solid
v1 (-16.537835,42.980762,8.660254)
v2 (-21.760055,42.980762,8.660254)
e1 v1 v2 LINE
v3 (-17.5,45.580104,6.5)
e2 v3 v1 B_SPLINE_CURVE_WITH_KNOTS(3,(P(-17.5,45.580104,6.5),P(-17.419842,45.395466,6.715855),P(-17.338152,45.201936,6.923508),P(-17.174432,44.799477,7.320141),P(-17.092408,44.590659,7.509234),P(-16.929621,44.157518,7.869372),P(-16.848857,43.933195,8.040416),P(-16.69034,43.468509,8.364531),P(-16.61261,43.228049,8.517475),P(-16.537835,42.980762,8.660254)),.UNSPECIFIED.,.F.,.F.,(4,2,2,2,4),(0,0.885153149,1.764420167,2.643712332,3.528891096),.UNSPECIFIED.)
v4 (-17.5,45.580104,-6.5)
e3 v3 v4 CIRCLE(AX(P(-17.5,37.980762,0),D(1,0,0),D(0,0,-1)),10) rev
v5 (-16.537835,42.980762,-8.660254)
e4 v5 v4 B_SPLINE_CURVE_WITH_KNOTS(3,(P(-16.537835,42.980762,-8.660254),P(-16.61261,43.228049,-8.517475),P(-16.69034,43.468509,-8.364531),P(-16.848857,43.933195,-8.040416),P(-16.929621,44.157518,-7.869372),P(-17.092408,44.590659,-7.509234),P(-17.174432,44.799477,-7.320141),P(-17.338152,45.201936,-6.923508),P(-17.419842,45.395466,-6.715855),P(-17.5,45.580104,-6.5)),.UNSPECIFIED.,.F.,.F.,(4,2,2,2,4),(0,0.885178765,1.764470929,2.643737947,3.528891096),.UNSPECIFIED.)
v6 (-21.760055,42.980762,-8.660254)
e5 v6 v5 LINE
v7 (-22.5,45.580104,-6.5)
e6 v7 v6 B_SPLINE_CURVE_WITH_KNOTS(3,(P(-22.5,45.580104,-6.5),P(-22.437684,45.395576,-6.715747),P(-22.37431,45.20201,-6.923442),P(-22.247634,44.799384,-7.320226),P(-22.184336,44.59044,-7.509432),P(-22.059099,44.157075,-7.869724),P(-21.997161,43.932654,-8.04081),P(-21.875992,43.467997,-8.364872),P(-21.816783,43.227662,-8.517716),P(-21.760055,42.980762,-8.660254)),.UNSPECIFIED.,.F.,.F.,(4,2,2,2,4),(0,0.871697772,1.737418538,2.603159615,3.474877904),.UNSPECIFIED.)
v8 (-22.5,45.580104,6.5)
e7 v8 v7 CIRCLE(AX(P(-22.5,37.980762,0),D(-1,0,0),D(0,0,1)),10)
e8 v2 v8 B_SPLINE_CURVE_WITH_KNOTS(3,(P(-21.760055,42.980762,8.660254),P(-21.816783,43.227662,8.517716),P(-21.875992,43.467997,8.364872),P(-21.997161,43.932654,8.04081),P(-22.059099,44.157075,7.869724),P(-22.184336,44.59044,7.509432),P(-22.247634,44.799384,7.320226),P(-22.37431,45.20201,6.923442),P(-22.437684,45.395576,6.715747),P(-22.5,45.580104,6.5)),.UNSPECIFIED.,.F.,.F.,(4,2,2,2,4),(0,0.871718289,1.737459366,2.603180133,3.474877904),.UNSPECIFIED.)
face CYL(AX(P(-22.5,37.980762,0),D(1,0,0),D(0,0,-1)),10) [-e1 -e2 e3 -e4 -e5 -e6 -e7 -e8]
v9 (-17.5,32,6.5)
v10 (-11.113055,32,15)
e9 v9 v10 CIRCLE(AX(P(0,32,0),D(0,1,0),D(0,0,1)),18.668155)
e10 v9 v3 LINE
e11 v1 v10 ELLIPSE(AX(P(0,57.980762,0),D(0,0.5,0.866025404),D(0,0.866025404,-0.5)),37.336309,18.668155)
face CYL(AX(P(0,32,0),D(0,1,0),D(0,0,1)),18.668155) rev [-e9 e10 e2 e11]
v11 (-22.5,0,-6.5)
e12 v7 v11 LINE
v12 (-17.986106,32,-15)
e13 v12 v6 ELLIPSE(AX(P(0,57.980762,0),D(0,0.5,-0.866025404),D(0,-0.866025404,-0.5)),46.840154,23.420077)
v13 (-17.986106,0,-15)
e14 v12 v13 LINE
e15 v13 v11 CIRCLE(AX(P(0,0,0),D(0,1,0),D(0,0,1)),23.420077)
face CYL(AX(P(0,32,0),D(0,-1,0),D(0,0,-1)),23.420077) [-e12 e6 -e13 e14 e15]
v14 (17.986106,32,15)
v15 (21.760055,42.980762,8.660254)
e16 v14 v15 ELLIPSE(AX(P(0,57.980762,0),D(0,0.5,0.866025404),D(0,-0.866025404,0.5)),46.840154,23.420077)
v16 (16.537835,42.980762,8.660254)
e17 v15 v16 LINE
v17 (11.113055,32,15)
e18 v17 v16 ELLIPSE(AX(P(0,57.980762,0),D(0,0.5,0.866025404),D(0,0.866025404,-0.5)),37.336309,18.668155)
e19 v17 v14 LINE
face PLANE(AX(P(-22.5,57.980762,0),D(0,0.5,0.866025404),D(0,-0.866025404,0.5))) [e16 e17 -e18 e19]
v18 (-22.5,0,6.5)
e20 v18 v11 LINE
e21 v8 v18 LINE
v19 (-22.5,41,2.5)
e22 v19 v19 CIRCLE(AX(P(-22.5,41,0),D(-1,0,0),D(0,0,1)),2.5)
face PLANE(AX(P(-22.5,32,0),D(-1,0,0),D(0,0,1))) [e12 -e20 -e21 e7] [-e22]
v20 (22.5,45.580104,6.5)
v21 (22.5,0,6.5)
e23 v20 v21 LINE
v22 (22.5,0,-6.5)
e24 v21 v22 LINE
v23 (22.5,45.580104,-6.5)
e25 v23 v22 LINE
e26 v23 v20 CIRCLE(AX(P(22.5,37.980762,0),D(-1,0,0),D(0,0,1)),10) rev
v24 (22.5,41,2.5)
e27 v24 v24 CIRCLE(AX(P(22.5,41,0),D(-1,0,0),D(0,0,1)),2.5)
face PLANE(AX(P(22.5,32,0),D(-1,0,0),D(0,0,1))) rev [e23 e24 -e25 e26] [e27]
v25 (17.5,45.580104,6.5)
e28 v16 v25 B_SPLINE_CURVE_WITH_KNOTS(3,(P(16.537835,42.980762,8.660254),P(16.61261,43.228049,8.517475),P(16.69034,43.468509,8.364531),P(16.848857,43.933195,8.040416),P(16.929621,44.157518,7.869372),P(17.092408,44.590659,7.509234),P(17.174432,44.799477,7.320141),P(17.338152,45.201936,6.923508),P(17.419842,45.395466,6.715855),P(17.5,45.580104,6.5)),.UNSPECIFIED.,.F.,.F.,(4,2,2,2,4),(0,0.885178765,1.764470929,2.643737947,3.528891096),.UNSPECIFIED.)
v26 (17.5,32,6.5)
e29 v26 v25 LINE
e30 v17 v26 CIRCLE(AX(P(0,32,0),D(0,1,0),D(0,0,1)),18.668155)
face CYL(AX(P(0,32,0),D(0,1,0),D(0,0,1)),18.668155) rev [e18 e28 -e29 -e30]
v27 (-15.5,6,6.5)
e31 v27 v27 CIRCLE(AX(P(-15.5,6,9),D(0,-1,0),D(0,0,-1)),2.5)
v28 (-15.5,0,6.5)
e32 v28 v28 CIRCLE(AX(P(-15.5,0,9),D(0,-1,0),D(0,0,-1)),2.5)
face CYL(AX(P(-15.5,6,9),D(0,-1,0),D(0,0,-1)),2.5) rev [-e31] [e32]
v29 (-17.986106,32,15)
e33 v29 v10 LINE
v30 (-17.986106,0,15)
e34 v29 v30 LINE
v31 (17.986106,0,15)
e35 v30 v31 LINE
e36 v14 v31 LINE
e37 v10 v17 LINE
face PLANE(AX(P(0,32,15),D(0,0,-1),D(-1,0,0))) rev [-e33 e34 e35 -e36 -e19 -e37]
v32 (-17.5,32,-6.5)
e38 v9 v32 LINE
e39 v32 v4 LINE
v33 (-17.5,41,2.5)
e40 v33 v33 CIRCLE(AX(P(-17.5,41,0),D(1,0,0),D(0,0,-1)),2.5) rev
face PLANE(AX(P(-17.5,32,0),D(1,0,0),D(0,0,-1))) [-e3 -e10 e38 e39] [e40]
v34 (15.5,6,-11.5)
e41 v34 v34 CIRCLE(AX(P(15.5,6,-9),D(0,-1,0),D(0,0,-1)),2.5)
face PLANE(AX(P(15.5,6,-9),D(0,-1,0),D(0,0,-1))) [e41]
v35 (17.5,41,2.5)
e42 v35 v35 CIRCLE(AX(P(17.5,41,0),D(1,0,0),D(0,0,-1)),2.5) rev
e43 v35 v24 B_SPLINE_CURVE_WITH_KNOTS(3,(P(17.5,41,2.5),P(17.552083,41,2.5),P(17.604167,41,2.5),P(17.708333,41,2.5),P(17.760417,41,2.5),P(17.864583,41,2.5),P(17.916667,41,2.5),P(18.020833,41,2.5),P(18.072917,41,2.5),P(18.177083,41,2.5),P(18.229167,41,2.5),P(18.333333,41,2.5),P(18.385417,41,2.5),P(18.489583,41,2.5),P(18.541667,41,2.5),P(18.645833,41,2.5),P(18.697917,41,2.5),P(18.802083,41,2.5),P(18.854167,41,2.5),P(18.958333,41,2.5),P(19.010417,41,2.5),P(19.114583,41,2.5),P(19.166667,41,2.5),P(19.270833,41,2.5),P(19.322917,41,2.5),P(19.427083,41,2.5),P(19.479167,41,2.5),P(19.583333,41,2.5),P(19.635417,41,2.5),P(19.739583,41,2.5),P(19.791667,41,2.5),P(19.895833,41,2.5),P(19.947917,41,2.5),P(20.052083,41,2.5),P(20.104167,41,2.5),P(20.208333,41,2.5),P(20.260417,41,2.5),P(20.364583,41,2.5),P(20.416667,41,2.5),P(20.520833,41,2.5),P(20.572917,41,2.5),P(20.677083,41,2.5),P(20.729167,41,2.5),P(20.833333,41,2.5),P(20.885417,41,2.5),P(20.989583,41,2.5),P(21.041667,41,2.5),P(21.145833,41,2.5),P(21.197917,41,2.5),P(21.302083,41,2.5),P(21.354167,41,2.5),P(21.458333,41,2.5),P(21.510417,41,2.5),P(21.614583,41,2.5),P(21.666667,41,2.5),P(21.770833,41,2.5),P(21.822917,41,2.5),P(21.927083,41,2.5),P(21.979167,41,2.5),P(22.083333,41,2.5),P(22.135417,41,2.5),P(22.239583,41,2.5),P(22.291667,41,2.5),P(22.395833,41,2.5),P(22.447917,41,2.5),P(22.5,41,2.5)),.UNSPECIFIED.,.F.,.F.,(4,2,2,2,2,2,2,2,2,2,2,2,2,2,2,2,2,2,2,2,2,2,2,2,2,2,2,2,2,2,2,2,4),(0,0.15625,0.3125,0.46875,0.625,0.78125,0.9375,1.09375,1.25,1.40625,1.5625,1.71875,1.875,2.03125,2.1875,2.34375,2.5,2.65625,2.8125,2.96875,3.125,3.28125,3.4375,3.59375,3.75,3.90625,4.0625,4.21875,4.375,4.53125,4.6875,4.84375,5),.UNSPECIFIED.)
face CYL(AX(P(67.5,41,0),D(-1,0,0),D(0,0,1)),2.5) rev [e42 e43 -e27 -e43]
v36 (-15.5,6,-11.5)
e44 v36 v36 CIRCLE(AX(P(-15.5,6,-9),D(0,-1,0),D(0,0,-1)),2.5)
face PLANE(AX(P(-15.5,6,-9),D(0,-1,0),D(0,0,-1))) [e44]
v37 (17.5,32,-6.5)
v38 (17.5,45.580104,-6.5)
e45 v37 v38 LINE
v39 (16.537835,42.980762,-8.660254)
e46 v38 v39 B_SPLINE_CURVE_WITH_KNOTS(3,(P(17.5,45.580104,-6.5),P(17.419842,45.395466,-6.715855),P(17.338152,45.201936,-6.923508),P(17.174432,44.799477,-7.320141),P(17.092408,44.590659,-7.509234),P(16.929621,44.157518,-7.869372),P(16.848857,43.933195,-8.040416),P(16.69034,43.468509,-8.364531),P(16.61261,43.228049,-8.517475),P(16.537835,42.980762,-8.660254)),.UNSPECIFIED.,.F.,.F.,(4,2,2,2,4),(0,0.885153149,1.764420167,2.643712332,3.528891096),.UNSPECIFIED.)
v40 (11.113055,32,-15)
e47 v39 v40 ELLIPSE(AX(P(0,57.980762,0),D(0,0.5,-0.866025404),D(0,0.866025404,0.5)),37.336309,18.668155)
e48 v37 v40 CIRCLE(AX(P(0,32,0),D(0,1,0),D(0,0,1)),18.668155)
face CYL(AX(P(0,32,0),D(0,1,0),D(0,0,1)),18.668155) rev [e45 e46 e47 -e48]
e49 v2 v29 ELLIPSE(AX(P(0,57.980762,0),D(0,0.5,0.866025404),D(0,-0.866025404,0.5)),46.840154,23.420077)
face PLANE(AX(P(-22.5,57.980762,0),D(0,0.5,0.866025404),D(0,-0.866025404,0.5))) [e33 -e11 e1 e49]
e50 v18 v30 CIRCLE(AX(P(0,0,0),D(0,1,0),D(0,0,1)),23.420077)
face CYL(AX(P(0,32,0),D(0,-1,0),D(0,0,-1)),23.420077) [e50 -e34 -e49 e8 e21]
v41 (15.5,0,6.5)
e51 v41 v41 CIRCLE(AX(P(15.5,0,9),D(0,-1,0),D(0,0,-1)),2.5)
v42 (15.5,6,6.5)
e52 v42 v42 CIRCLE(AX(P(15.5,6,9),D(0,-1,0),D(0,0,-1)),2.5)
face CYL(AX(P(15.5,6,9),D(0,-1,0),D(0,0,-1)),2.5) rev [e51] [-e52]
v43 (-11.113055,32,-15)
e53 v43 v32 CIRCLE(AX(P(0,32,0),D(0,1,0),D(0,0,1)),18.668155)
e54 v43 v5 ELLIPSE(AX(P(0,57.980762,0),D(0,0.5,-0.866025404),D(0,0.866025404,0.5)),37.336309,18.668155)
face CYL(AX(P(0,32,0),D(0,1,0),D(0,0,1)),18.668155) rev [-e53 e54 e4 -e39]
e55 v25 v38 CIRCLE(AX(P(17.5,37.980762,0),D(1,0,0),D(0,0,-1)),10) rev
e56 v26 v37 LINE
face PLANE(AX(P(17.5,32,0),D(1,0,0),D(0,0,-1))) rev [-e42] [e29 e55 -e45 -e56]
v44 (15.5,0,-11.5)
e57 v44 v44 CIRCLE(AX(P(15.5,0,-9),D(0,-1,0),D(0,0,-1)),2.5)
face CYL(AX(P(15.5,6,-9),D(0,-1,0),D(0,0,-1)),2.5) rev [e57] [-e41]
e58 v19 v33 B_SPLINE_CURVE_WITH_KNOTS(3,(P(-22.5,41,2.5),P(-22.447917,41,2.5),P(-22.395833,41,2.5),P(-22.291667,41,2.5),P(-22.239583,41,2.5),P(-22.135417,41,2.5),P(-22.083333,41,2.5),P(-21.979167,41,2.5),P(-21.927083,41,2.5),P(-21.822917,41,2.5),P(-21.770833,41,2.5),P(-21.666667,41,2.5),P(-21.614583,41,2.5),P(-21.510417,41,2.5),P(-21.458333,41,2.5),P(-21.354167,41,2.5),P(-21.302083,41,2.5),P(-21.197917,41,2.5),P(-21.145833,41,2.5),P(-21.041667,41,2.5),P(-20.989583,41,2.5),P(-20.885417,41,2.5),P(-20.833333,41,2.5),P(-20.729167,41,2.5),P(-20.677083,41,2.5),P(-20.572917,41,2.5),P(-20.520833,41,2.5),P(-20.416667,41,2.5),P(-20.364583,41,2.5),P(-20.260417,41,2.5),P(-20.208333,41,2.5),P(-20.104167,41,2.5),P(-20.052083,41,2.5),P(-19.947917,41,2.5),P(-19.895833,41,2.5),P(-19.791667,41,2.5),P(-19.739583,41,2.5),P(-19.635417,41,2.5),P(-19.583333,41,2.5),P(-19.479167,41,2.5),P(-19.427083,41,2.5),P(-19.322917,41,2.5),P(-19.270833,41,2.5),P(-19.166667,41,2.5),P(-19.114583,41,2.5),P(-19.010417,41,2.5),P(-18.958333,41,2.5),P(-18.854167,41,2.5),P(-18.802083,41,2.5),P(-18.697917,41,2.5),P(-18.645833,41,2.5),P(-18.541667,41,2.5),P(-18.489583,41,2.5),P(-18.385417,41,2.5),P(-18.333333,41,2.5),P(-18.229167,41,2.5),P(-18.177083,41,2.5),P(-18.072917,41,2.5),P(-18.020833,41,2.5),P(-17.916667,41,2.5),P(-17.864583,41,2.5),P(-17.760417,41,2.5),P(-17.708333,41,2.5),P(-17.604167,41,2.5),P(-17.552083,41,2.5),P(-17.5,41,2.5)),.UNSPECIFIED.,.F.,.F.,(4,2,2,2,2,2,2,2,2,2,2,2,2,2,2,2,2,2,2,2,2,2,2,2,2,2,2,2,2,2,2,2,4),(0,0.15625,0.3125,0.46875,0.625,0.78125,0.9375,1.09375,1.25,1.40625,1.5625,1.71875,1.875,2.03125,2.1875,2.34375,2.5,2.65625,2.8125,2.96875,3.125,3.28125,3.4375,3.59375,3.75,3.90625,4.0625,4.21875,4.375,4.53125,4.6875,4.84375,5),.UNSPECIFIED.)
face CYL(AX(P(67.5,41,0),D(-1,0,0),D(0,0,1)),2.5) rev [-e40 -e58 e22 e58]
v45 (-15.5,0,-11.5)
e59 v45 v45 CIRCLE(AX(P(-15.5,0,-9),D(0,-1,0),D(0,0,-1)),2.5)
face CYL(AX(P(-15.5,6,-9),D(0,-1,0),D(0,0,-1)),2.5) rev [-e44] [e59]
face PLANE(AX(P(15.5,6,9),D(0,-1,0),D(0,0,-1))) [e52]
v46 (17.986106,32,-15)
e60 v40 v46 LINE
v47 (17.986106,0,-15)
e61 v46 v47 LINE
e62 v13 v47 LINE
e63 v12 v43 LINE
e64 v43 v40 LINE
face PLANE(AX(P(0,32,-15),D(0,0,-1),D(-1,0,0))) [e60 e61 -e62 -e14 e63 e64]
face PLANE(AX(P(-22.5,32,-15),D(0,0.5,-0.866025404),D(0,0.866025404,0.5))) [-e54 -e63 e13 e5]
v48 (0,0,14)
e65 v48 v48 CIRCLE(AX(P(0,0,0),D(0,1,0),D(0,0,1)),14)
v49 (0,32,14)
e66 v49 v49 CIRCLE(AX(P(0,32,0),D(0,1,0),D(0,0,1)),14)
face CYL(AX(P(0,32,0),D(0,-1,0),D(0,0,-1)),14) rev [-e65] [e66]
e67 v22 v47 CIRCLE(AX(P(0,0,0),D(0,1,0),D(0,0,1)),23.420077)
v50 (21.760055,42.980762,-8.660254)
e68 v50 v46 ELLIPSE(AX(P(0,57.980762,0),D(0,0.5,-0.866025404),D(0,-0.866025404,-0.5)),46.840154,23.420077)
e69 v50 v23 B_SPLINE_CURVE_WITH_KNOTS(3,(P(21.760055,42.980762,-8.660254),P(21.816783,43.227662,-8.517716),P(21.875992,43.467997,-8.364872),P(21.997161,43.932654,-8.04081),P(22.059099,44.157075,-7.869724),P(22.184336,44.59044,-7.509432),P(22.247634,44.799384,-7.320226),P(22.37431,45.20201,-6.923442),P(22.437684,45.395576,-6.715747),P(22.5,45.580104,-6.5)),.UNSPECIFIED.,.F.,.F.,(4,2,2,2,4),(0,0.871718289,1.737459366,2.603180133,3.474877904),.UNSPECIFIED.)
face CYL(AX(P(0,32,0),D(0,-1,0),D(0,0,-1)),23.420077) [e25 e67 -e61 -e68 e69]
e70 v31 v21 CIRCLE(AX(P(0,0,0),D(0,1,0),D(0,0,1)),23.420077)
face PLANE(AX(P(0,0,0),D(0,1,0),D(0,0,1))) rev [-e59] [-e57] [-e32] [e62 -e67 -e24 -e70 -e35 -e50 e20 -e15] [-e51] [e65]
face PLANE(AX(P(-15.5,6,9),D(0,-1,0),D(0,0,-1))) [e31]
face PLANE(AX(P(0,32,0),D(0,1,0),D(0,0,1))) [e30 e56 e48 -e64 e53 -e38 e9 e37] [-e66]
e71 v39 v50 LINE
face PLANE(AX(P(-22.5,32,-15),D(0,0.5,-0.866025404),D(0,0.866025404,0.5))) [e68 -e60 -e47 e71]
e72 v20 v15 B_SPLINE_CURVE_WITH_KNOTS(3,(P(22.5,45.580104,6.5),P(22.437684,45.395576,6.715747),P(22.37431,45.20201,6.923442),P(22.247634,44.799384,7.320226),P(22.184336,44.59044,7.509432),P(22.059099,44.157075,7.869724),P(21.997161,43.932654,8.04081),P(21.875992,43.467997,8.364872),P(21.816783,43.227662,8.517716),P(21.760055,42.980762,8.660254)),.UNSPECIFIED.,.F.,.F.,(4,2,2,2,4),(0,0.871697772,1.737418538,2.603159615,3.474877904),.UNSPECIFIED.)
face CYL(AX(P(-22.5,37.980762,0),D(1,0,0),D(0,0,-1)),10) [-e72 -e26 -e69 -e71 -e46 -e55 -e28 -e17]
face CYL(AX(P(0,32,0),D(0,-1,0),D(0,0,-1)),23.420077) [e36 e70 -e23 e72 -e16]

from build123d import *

# Parameters (mm, degrees)
SKETCH1_R              = 14
BOSS_EXTRUDE1_DEPTH    = 32
BOSS_EXTRUDE2_DEPTH    = 45
SKETCH4_R              = 49.397099685
SKETCH4_R_2            = 14
CUT_EXTRUDE1_DEPTH     = 90
FILLET1_R              = 10
SKETCH6_R              = 2.5
CUT_EXTRUDE2_DEPTH     = 90
CUT_EXTRUDE3_START     = -18
CUT_EXTRUDE3_OUTLINE_R = 14
CUT_EXTRUDE3_DEPTH     = 17
SKETCH8_R              = 2.5
CUT_EXTRUDE4_DEPTH     = 6


with BuildPart() as part:
    # Sketch1 → Boss-Extrude1 (new body)
    with BuildSketch(Plane(origin=(0, 0, 0), x_dir=(1, 0, 0), z_dir=(0, 1, 0))):
        with BuildLine():
            ThreePointArc((-22.5, -6.5), (-20.684382748, -10.984366633), (-17.986105749, -15))
            Line((-17.986105749, -15), (17.986105749, -15))
            ThreePointArc((17.986105749, -15), (20.684382748, -10.984366633), (22.5, -6.5))
            Line((22.5, -6.5), (22.5, 6.5))
            ThreePointArc((22.5, 6.5), (20.684382748, 10.984366633), (17.986105749, 15))
            Line((17.986105749, 15), (-17.986105749, 15))
            ThreePointArc((-17.986105749, 15), (-20.684382748, 10.984366633), (-22.5, 6.5))
            Line((-22.5, 6.5), (-22.5, -6.5))
        make_face()
        with Locations(Location((0, 0, 0), (0, 0, 270))):
            Circle(SKETCH1_R, mode=Mode.SUBTRACT)
    extrude(amount=BOSS_EXTRUDE1_DEPTH)

    # Sketch3 → Boss-Extrude2 (add)
    with BuildSketch(Plane(origin=(22.5, 0, 0), x_dir=(0, 0, -1), z_dir=(1, 0, 0))):
        Polygon((-15, 32), (15, 32), (0, 57.980762114), align=None)
    extrude(amount=-BOSS_EXTRUDE2_DEPTH)

    # Sketch4 → Cut-Extrude1 (cut)
    # profile 1 of 2: a face of its own
    with BuildSketch(Plane.XZ):
        Circle(SKETCH4_R)
        with BuildLine():
            ThreePointArc((22.5, 6.5), (23.188916849, 3.282397806), (23.420076857, 0))
            ThreePointArc((23.420076857, 0), (23.188916849, -3.282397806), (22.5, -6.5))
            ThreePointArc((22.5, -6.5), (20.684382748, -10.984366633), (17.986105749, -15))
            ThreePointArc((17.986105749, -15), (0, -23.420076857), (-17.986105749, -15))
            ThreePointArc((-17.986105749, -15), (-20.684382748, -10.984366633), (-22.5, -6.5))
            ThreePointArc((-22.5, -6.5), (-23.420076857, 0), (-22.5, 6.5))
            ThreePointArc((-22.5, 6.5), (-20.684382748, 10.984366633), (-17.986105749, 15))
            ThreePointArc((-17.986105749, 15), (0, 23.420076857), (17.986105749, 15))
            ThreePointArc((17.986105749, 15), (20.684382748, 10.984366633), (22.5, 6.5))
        make_face(mode=Mode.SUBTRACT)
    # profile 2 of 2: a face of its own
    with BuildSketch(Plane.XZ):
        Circle(SKETCH4_R_2)
    extrude(amount=-CUT_EXTRUDE1_DEPTH, mode=Mode.SUBTRACT)

    # Fillet1
    # the kernel refuses this fillet: 10 mm, written as the material it takes off along each edge
    with BuildSketch(Plane(origin=(29.301270189, 57.980762114, 0), x_dir=(0, -0.8660254037844386, -0.5), z_dir=(-1, 0, 0)), Plane(origin=(65.801270189, 57.980762114, 0), x_dir=(0, -0.8660254037844386, -0.5), z_dir=(-1, 0, 0))) as fillet1_piece_1:
        with BuildLine():
            CenterArc((FILLET1_R * 1.73205080757, FILLET1_R), FILLET1_R, 150, 120)
            Line((FILLET1_R * 0.866025403784, FILLET1_R * 1.5), (0, 0))
            Line((0, 0), (FILLET1_R * 1.73205080757, 0))
        make_face()
    extrude(amount=95.102540378, mode=Mode.SUBTRACT)

    # Sketch6 → Cut-Extrude2 (cut)
    with BuildSketch(Plane.ZY.offset(22.5)):
        with Locations((0, 41)):
            Circle(SKETCH6_R)
    extrude(amount=-CUT_EXTRUDE2_DEPTH, mode=Mode.SUBTRACT)

    # Cut-Extrude3: read off the stored shape, not the designer's step
    # Cut-Extrude3 outline → Cut-Extrude3 (cut)
    with BuildSketch(Plane(origin=(0, 50, 0), x_dir=(1, 0, 0), z_dir=(0, 1, 0)).offset(CUT_EXTRUDE3_START)):
        with BuildLine():
            ThreePointArc((-17.5, -6.5), (-14.924450898, -11.21431074), (-11.113055385, -15))
            Line((-11.113055385, -15), (11.113055385, -15))
            ThreePointArc((11.113055385, -15), (14.924450898, -11.21431074), (17.5, -6.5))
            Line((17.5, -6.5), (17.5, 6.5))
            ThreePointArc((17.5, 6.5), (14.924450898, 11.21431074), (11.113055385, 15))
            Line((11.113055385, 15), (-11.113055385, 15))
            ThreePointArc((-11.113055385, 15), (-14.924450898, 11.21431074), (-17.5, 6.5))
            Line((-17.5, 6.5), (-17.5, -6.5))
        make_face()
        Circle(CUT_EXTRUDE3_OUTLINE_R, mode=Mode.SUBTRACT)
    extrude(amount=CUT_EXTRUDE3_DEPTH, mode=Mode.SUBTRACT)

    # Sketch8 → Cut-Extrude4 (cut)
    with BuildSketch(Plane.XZ):
        with Locations(Location((-15.5, 9, 0), (0, 0, 270))):
            Circle(SKETCH8_R)
        with Locations(Location((15.5, 9, 0), (0, 0, 270))):
            Circle(SKETCH8_R)
        with Locations(Location((15.5, -9, 0), (0, 0, 270))):
            Circle(SKETCH8_R)
        with Locations(Location((-15.5, -9, 0), (0, 0, 270))):
            Circle(SKETCH8_R)
    extrude(amount=-CUT_EXTRUDE4_DEPTH, mode=Mode.SUBTRACT)


solid = part.part
